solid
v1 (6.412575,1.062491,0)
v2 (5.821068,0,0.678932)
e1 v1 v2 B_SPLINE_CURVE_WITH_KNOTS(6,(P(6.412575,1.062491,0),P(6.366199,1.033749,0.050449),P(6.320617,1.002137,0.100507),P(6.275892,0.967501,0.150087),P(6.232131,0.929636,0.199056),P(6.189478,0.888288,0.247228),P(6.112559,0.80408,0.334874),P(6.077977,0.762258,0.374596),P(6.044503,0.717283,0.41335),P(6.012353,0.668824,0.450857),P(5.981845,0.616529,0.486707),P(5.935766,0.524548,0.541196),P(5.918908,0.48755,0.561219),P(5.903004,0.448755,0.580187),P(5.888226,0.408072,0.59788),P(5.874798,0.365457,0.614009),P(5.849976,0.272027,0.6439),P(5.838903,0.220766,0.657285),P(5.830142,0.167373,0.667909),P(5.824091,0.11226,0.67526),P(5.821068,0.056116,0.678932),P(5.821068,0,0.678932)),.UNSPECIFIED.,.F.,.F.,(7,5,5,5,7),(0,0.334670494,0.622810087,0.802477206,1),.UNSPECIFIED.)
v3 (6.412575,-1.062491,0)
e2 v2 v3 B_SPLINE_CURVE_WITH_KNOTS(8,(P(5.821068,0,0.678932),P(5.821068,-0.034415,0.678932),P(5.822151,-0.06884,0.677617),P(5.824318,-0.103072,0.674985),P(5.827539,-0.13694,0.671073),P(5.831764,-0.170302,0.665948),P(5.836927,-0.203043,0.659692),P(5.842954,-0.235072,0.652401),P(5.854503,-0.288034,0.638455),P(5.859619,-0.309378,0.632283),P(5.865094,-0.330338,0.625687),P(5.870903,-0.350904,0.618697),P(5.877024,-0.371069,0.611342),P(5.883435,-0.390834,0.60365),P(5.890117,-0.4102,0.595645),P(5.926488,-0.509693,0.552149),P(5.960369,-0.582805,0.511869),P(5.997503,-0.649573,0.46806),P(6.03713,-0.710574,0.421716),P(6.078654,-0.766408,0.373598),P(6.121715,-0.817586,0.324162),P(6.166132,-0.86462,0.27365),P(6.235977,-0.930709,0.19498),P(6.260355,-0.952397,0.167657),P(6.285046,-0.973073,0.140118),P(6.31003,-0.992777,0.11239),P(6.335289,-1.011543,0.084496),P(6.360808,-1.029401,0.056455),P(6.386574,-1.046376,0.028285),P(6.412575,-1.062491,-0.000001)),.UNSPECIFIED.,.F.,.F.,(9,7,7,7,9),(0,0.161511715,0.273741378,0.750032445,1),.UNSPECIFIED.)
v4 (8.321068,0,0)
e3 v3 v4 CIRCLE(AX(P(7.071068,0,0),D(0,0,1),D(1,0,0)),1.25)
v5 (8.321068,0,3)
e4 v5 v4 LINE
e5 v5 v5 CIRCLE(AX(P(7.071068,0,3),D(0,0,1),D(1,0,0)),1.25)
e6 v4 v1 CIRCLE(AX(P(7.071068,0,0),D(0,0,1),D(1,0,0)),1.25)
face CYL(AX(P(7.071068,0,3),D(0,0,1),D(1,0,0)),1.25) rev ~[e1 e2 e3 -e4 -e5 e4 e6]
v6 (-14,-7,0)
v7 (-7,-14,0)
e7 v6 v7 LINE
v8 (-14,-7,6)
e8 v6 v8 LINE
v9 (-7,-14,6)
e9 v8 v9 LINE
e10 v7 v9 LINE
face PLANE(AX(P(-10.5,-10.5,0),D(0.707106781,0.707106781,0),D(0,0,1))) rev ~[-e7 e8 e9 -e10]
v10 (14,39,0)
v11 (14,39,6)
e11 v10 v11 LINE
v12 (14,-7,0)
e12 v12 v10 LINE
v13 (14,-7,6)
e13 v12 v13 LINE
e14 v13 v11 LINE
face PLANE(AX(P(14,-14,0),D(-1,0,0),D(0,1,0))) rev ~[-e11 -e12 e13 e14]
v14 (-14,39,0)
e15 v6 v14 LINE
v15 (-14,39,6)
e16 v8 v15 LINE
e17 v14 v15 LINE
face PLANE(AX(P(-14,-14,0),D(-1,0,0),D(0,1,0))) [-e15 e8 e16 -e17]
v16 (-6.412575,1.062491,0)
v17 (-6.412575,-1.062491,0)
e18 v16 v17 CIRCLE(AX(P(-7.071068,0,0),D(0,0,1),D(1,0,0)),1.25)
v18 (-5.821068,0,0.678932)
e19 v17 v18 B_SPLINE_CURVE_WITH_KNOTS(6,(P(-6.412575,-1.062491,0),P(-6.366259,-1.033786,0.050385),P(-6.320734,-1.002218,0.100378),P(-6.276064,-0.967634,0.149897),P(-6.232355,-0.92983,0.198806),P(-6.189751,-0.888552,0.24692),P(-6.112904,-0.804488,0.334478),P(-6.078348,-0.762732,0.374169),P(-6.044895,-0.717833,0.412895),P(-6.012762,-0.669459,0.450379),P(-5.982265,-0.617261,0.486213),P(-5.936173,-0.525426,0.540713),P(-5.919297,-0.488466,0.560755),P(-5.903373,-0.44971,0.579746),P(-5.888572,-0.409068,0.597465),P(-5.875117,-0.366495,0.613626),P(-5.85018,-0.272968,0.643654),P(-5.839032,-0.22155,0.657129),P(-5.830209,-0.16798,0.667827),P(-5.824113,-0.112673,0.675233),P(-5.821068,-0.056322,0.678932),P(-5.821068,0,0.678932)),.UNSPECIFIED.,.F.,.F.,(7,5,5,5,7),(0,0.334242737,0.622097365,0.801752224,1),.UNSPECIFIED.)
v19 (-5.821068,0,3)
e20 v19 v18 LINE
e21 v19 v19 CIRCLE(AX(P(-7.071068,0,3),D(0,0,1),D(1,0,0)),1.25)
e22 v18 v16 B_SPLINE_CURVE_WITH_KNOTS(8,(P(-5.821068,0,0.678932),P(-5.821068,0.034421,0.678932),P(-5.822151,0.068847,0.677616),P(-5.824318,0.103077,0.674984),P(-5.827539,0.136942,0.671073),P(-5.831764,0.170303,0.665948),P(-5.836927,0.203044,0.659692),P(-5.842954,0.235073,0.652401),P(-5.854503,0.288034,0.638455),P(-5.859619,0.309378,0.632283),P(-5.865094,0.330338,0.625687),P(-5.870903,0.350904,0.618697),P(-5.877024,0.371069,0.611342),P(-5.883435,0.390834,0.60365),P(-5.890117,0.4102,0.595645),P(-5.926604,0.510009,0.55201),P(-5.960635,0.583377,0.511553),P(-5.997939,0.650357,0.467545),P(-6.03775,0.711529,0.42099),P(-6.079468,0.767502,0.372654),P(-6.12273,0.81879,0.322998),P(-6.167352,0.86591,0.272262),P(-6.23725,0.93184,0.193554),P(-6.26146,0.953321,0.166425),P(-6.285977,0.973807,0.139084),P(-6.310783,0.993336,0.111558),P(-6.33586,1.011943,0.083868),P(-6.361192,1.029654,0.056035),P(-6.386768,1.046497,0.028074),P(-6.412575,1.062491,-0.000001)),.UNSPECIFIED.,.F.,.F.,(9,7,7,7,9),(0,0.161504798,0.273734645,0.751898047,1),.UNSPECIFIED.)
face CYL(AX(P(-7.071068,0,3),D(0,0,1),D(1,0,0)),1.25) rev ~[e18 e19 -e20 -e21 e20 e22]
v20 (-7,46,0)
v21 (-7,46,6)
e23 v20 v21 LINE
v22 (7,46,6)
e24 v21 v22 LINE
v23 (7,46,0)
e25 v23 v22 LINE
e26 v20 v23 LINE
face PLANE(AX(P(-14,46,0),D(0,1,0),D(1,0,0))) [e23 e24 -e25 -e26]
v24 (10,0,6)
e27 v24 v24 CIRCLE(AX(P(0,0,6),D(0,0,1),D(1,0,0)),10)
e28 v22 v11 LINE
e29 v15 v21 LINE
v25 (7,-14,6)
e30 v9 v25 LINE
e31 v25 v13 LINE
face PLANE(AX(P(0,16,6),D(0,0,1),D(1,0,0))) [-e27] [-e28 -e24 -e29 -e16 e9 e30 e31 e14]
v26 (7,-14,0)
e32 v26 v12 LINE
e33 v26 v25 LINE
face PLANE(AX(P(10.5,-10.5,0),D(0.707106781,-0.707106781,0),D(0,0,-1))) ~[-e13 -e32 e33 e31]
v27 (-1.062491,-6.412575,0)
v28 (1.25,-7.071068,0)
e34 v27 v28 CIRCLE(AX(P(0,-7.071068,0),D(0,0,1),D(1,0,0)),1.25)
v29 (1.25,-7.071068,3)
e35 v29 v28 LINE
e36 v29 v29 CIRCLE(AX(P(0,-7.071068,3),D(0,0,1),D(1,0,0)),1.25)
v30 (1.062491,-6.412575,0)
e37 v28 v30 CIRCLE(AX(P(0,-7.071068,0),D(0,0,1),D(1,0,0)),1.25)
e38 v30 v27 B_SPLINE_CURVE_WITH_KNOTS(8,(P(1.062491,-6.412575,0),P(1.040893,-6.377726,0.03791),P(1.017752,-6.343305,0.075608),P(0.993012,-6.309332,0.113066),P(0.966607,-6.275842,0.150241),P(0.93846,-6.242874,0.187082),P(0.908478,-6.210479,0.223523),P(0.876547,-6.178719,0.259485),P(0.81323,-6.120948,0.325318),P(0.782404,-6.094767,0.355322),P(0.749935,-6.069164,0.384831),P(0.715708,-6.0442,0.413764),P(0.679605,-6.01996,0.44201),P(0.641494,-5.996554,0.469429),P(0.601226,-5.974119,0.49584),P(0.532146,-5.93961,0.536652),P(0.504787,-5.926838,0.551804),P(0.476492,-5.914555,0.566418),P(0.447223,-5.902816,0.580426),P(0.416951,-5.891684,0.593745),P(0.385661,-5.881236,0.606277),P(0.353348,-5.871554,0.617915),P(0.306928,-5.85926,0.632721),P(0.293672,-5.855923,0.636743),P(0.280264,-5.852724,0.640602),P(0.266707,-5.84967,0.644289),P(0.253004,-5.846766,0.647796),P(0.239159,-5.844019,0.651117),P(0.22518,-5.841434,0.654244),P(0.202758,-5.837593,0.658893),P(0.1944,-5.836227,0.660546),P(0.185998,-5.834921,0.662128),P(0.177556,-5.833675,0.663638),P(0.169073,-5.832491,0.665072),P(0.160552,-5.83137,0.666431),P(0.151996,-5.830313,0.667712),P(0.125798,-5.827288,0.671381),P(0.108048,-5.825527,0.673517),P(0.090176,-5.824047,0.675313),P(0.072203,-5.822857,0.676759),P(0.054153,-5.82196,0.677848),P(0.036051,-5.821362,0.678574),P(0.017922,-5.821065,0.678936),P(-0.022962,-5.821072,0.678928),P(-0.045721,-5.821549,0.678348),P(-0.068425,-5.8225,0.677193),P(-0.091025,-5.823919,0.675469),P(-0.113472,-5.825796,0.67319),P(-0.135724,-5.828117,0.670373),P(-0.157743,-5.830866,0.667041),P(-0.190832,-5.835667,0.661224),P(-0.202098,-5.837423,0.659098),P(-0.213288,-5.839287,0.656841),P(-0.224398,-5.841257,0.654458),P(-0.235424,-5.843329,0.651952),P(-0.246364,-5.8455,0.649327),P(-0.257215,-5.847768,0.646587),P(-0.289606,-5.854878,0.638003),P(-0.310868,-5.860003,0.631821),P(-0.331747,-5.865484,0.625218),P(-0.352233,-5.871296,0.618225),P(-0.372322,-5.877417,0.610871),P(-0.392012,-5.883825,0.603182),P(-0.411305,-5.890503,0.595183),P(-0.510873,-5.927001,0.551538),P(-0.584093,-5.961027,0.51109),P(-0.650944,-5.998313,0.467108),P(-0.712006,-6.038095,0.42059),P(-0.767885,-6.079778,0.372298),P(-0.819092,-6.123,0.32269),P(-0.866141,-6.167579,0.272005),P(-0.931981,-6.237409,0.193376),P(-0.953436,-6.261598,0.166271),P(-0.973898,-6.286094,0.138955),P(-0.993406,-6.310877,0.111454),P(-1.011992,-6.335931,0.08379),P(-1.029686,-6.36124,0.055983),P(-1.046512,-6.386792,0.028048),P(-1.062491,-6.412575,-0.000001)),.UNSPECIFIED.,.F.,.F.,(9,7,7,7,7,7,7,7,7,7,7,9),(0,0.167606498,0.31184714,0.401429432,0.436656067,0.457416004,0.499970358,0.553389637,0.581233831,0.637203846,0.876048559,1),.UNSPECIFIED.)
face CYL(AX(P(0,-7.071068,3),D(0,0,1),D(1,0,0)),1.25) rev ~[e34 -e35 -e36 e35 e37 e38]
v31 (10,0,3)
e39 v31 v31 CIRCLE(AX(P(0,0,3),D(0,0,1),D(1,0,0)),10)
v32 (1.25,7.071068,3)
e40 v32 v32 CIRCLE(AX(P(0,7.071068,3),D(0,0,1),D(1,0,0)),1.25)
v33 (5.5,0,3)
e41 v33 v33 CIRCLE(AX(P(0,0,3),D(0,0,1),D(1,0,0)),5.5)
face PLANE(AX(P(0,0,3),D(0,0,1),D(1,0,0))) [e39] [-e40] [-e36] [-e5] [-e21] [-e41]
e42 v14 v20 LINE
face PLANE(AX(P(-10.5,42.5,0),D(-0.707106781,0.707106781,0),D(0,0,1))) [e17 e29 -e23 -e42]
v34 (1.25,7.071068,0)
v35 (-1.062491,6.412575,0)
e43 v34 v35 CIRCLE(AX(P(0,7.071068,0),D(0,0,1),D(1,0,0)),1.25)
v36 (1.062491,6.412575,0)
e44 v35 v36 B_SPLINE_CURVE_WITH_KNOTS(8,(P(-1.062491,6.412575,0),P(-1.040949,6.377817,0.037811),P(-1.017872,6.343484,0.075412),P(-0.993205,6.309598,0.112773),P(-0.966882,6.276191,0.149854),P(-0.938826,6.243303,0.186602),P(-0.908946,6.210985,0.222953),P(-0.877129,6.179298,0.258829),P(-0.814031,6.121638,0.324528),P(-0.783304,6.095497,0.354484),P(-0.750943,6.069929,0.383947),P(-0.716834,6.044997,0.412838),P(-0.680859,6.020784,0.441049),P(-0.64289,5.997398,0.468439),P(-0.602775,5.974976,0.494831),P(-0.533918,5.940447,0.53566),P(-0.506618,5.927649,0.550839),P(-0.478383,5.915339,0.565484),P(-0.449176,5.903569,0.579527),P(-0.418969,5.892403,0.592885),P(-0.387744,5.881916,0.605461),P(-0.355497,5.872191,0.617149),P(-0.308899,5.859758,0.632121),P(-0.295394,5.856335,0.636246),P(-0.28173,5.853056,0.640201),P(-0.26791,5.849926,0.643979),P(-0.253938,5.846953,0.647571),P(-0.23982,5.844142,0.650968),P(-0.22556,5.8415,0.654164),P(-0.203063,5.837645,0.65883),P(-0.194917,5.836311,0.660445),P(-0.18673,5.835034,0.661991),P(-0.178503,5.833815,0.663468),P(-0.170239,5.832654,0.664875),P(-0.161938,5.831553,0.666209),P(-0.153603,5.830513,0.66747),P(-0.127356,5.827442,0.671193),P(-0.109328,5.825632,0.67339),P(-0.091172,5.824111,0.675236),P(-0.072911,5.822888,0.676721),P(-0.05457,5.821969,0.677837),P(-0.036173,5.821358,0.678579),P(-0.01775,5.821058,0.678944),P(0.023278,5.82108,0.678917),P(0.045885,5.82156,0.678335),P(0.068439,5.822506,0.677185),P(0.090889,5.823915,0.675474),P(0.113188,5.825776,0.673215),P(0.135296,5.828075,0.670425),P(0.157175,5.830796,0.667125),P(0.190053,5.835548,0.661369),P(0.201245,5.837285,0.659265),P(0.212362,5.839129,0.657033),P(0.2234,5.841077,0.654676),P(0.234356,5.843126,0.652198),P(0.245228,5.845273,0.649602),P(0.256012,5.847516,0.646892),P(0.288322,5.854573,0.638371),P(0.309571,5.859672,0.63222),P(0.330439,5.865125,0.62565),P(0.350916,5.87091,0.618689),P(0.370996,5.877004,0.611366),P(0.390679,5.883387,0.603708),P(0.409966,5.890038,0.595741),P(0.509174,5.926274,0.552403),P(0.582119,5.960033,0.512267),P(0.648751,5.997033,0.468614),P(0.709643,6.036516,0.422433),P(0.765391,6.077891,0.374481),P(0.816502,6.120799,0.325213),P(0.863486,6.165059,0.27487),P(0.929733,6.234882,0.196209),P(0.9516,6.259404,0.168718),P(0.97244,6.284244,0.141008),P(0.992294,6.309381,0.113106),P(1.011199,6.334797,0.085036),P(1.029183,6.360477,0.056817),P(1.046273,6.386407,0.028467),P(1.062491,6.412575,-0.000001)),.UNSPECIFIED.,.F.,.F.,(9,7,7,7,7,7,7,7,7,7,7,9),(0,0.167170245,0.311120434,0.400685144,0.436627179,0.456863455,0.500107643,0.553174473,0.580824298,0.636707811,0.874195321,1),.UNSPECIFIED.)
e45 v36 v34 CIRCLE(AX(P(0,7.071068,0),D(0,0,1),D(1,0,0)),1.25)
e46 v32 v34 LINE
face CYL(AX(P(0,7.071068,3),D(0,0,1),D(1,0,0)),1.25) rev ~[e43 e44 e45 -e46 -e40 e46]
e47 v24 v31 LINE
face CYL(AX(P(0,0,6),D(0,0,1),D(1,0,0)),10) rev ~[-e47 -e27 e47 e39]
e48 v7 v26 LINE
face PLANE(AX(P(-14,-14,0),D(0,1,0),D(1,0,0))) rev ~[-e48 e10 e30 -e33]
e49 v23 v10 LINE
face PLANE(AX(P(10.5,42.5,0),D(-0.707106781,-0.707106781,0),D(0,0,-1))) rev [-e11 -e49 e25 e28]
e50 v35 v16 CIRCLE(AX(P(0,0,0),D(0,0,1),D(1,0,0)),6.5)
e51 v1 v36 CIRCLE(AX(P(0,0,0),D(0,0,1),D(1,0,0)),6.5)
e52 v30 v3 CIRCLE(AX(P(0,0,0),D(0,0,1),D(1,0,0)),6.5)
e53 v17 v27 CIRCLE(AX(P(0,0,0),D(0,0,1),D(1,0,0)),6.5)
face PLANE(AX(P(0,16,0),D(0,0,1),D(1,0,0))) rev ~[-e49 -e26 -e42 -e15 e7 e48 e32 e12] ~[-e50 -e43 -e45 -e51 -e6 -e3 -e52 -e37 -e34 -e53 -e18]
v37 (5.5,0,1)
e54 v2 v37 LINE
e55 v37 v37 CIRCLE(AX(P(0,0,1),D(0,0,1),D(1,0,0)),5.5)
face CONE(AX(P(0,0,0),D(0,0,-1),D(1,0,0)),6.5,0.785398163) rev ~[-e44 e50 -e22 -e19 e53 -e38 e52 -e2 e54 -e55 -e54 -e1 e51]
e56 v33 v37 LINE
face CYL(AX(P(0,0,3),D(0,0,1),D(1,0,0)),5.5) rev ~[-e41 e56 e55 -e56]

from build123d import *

# Parameters (mm, degrees)
F0_W     = 28
F0_H     = 60
F1_DEPTH = 6
F2_R     = 10
F3_DEPTH = 3
F4_R     = 5.5
F4_R_2   = 1.25
F5_DEPTH = 3.001
F7_SIZE  = 7


# Not quite as in the source:
# - a fillet or chamfer that OpenCascade refuses, or shapes differently, is made with other operations: its cross-section is extruded or revolved along the edge and cut away or added


with BuildPart() as f1:
    # F0 (on Top) → F1 (new body)
    with BuildSketch(Plane.XY):
        with Locations((0, 16)):
            Rectangle(F0_W, F0_H)
    extrude(amount=F1_DEPTH)

    # F2 (on face) → F3 (cut)
    with BuildSketch(Plane.XY.offset(6)):
        Circle(F2_R)
    extrude(amount=-F3_DEPTH, mode=Mode.SUBTRACT)

    # F4 (on face) → F5 (cut, through all)
    with BuildSketch(Plane.XY.offset(3)):
        Circle(F4_R)
        with Locations((0, 7.0710678119)):
            Circle(F4_R_2)
        with Locations((7.0710678119, 0)):
            Circle(F4_R_2)
        with Locations((0, -7.0710678119)):
            Circle(F4_R_2)
        with Locations((-7.0710678119, 0)):
            Circle(F4_R_2)
    extrude(amount=-F5_DEPTH, mode=Mode.SUBTRACT)

    # F6: chamfer of 1 on 1 edges, made by hand

    # F6_s1 → F6_t2 (revolve, cut)
    with BuildSketch(Plane.XZ):
        Polygon((6.5, 0), (5.5, 1), (5.5, 0), align=None)
    revolve(axis=Axis((0, 0, 0), (0, 0, 1)), mode=Mode.SUBTRACT)

    # F7
    f7_edges = [f1.edges().sort_by_distance(p)[0] for p in [
        (14, -14, 3),
        (-14, -14, 3),
        (14, 46, 3),
        (-14, 46, 3),
    ]]
    chamfer(f7_edges, length=F7_SIZE)


solid = f1.part
